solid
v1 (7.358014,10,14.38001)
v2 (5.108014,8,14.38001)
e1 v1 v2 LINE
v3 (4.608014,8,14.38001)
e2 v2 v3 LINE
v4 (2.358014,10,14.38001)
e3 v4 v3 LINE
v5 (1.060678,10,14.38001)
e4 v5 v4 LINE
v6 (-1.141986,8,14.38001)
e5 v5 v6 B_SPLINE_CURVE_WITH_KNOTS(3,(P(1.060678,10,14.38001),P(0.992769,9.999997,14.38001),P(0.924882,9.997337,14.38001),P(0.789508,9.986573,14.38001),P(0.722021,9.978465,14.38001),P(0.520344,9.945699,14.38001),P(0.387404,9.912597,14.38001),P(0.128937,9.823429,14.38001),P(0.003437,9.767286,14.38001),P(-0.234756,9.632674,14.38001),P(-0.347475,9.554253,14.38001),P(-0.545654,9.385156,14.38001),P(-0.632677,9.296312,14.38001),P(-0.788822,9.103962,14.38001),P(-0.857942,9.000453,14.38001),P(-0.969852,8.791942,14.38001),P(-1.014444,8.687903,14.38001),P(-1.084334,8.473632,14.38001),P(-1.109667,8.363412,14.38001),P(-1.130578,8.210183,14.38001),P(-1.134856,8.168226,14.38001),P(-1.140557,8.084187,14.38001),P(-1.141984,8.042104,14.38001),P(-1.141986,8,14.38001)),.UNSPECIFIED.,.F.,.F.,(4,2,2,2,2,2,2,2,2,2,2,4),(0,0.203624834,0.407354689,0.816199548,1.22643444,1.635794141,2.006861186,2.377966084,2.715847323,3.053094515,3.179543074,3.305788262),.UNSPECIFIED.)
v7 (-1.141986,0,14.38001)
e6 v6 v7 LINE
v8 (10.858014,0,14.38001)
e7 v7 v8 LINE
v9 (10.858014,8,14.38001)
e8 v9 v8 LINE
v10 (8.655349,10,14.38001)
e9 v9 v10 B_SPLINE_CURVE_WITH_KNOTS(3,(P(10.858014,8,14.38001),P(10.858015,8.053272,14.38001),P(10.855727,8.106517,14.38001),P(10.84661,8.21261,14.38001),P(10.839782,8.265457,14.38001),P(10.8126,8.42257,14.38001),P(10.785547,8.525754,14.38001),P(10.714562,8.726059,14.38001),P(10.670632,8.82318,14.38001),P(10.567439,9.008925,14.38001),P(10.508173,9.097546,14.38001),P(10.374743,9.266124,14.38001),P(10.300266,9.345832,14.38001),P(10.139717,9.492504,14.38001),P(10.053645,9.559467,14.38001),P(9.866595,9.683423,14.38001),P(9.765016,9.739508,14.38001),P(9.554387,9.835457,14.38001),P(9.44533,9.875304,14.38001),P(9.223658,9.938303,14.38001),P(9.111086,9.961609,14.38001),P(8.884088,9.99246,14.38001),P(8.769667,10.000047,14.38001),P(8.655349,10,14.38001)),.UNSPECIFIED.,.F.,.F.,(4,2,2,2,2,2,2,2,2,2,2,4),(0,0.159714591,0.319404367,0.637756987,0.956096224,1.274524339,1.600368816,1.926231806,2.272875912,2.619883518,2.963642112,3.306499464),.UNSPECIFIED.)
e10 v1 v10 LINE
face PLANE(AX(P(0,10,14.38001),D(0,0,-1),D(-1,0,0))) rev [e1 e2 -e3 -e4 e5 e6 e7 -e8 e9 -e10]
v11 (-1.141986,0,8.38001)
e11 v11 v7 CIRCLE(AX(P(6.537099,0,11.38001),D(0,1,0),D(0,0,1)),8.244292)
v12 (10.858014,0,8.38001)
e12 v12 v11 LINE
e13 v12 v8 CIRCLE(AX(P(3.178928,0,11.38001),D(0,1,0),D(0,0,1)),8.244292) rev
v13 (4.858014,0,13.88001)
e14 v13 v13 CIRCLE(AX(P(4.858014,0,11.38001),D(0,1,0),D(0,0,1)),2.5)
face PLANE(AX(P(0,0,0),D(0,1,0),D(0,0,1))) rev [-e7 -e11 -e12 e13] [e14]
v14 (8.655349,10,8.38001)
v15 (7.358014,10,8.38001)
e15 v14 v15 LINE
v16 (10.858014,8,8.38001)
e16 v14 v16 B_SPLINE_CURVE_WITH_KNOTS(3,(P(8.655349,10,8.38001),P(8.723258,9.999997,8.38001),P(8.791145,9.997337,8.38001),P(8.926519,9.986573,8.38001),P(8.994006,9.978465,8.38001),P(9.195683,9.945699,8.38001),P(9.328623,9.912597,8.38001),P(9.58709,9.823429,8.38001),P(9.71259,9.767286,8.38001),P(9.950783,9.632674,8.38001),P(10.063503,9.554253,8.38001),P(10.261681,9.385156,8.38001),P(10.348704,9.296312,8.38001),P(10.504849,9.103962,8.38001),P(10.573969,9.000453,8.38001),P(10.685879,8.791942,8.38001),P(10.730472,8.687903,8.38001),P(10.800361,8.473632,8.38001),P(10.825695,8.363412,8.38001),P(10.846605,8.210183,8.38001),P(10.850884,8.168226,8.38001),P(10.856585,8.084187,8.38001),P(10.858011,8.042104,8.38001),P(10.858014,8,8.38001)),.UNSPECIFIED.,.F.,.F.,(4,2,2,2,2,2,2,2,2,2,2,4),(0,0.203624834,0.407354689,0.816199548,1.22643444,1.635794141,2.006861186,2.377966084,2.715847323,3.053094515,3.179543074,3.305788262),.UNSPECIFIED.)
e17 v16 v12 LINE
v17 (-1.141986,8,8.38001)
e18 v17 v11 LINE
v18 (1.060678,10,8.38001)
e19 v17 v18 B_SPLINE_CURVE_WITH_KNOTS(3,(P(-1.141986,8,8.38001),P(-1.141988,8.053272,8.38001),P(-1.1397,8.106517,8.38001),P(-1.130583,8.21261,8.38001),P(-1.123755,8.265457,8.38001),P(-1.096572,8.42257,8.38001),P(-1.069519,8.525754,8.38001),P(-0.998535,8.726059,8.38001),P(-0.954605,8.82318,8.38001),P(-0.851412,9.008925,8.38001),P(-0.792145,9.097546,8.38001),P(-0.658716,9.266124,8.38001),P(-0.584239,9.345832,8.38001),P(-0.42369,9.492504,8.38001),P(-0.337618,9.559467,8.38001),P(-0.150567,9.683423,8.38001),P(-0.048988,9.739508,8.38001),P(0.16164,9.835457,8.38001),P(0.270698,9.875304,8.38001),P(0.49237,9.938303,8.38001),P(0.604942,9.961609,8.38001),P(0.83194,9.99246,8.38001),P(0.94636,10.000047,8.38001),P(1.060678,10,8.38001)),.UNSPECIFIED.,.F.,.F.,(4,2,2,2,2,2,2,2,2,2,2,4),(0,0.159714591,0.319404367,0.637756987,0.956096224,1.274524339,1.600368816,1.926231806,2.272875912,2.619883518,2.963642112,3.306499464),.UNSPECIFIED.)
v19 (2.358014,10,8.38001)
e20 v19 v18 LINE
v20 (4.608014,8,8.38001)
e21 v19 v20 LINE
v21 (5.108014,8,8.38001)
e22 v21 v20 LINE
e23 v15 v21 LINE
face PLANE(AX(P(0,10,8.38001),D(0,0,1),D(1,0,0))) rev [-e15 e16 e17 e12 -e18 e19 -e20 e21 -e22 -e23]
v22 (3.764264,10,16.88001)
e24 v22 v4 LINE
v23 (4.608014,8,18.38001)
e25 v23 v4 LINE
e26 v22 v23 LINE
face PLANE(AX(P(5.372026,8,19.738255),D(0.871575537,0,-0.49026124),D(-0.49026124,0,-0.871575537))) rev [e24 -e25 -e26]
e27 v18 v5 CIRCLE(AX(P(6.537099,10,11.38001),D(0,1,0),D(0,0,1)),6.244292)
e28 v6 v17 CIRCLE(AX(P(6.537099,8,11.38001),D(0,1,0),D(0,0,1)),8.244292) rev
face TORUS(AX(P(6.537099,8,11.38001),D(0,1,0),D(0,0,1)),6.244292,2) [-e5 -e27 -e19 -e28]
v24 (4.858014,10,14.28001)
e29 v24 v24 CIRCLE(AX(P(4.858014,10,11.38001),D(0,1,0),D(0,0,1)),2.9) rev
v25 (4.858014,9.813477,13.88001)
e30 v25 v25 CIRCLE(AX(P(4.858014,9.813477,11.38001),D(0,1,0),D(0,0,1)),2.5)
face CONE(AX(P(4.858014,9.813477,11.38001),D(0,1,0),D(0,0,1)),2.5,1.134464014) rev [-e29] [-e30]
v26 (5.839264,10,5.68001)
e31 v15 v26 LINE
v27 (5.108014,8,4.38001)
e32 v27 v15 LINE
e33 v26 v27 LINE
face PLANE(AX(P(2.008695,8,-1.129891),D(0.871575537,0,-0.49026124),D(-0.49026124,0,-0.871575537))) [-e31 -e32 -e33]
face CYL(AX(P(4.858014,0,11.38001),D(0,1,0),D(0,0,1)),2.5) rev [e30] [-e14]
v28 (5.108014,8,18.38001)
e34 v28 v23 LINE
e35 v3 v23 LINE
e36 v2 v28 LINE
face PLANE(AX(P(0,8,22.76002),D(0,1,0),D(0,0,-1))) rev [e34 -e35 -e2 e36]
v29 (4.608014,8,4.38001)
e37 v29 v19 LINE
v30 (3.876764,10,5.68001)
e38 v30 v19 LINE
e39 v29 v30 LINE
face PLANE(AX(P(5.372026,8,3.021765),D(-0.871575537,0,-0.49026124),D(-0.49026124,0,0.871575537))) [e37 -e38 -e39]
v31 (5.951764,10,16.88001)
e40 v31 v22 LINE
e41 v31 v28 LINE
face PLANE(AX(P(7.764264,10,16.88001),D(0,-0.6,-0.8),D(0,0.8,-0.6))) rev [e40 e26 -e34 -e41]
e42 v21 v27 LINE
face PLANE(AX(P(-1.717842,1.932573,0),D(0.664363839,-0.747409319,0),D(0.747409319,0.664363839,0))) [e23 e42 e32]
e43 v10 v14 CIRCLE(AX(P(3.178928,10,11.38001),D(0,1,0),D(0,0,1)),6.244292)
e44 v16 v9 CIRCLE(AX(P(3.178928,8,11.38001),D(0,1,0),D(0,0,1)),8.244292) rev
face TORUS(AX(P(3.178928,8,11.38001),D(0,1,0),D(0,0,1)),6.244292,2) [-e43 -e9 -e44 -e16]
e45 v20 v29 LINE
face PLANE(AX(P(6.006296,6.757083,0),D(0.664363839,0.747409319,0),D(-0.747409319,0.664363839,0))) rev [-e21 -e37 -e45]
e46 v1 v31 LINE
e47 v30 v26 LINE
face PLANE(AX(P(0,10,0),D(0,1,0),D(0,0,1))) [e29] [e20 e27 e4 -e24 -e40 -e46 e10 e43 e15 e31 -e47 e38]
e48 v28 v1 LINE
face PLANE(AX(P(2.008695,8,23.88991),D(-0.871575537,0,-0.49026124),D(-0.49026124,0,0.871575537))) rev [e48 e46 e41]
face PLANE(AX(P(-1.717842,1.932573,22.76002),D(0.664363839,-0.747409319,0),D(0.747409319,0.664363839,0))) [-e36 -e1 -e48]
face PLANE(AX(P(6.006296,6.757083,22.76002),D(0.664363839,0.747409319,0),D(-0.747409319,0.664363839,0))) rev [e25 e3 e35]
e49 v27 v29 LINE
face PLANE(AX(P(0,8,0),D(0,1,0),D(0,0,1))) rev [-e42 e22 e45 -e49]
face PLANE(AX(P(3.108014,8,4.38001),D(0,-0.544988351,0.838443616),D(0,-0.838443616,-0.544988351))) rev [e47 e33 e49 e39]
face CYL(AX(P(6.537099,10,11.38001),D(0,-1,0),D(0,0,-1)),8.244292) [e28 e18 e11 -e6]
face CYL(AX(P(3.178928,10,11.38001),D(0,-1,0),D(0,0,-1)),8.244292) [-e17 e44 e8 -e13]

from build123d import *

# Parameters (mm, degrees)
SALIENTE_EXTRUIR1_DEPTH   = 10
CROQUIS2_R                = 2.5
CORTAR_EXTRUIR1_DEPTH     = 10
CHAFL_N1_SIZE             = 0.4
CHAFL_N1_SIZE2            = 0.186523063
SALIENTE_EXTRUIR2_DEPTH   = 2
CORTAR_EXTRUIR2_START     = 0.687515582
CORTAR_EXTRUIR2_OUTLINE_W = 5
CORTAR_EXTRUIR2_OUTLINE_H = 5
CORTAR_EXTRUIR2_DEPTH     = 2.312484418
CORTAR_EXTRUIR4_DEPTH     = 9.799366623
CORTAR_EXTRUIR5_DEPTH     = 4
CORTAR_EXTRUIR6_START     = 19.504007809
CORTAR_EXTRUIR6_OUTLINE_W = 5
CORTAR_EXTRUIR6_OUTLINE_H = 5
CORTAR_EXTRUIR6_DEPTH     = 1.2
REDONDEO1_R               = 2


with BuildPart() as part:
    # Croquis1 → Saliente-Extruir1 (new body)
    with BuildSketch(Plane(origin=(0, 0, 0), x_dir=(1, 0, 0), z_dir=(0, 1, 0))):
        with BuildLine():
            Line((4.858013613, -14.380009761), (4.858013613, -8.380009761))
            Line((4.858013613, -8.380009761), (-1.141986387, -8.380009761))
            ThreePointArc((-1.141986387, -8.380009761), (-1.707193124, -11.380009761), (-1.141986387, -14.380009761))
            Line((-1.141986387, -14.380009761), (4.858013613, -14.380009761))
        make_face()
        with BuildLine():
            Line((10.858013613, -8.380009761), (4.858013613, -8.380009761))
            Line((4.858013613, -8.380009761), (4.858013613, -14.380009761))
            Line((4.858013613, -14.380009761), (10.858013613, -14.380009761))
            ThreePointArc((10.858013613, -14.380009761), (11.423220351, -11.380009761), (10.858013613, -8.380009761))
        make_face()
    extrude(amount=SALIENTE_EXTRUIR1_DEPTH)

    # Croquis2 → Cortar-Extruir1 (cut)
    with BuildSketch(Plane(origin=(0, 10, 0), x_dir=(1, 0, 0), z_dir=(0, 1, 0))):
        with Locations(Location((4.858013613, -11.380009761, 0), (0, 0, 270))):
            Circle(CROQUIS2_R)
    extrude(amount=-CORTAR_EXTRUIR1_DEPTH, mode=Mode.SUBTRACT)

    # Chaflán1
    chafl_n1_edges = [part.edges().sort_by_distance(p)[0] for p in [
        (4.858013613, 10, 8.880009761),
    ]]
    chafl_n1_side = [part.faces().sort_by_distance(p)[0] for p in [
        (4.858013613, 10, 8.524373107),
    ]]
    chamfer(chafl_n1_edges, length=CHAFL_N1_SIZE, length2=CHAFL_N1_SIZE2, reference=chafl_n1_side[0])

    # Croquis3 → Saliente-Extruir2 (add)
    with BuildSketch(Plane(origin=(0, 10, 0), x_dir=(1, 0, 0), z_dir=(0, 1, 0))):
        Polygon((2.358013613, -8.380009761), (4.858013613, -8.380009761), (4.858013613, -4.380009761), (4.608013613, -4.380009761), align=None)
        Polygon((4.858013613, -4.380009761), (4.858013613, -8.380009761), (7.358013613, -8.380009761), (5.108013613, -4.380009761), align=None)
    saliente_extruir2 = extrude(amount=-SALIENTE_EXTRUIR2_DEPTH)

    # Cortar-Extruir2: read off the stored shape, not the designer's step
    # Cortar-Extruir2 outline → Cortar-Extruir2 (cut)
    with BuildSketch(Plane(origin=(0, 0, 0), x_dir=(1, 0, 0), z_dir=(0, 0.5449883505954141, -0.8384436163006372)).offset(CORTAR_EXTRUIR2_START)):
        with Locations((4.5, -10.5)):
            Rectangle(CORTAR_EXTRUIR2_OUTLINE_W, CORTAR_EXTRUIR2_OUTLINE_H)
    extrude(amount=CORTAR_EXTRUIR2_DEPTH, mode=Mode.SUBTRACT)

    # Cortar-Extruir4: read off the stored shape, not the designer's step
    # Cortar-Extruir4 outline → Cortar-Extruir4 (cut)
    with BuildSketch(Plane(origin=(-1.717842267, 1.932572551, 0), x_dir=(-0.7474093186836599, -0.6643638388299198, 0), z_dir=(0.6643638388299198, -0.7474093186836599, 0))):
        Polygon((-9.132687685, -4.380009761), (-12.14308633, -8.380009761), (-9.132687685, -8.380009761), align=None)
    cortar_extruir4 = extrude(amount=CORTAR_EXTRUIR4_DEPTH, mode=Mode.SUBTRACT)

    # Croquis13 → Cortar-Extruir5 (cut, along a direction that is not the sketch's normal)
    with BuildSketch(Plane(origin=(6.006295664, 6.757082622, 0), x_dir=(0.7474093186836596, -0.66436383882992, 0), z_dir=(0.66436383882992, 0.7474093186836596, 0))):
        Polygon((-1.870838395, -8.380009761), (-1.870838395, -4.380009761), (-4.88123704, -8.380009761), align=None)
    cortar_extruir5 = extrude(amount=-CORTAR_EXTRUIR5_DEPTH, dir=(0, 1, 0), mode=Mode.SUBTRACT)

    # Simetría1: Saliente-Extruir2 across plane
    add(saliente_extruir2.mirror(Plane(origin=(0, 0, 11.380009761), x_dir=(1, 0, 0), z_dir=(0, 0, -1))))

    # Simetría3: Cortar-Extruir4, Cortar-Extruir5 across plane
    add(cortar_extruir4.mirror(Plane(origin=(0, 0, 11.380009761), x_dir=(1, 0, 0), z_dir=(0, 0, -1))), mode=Mode.SUBTRACT)
    add(cortar_extruir5.mirror(Plane(origin=(0, 0, 11.380009761), x_dir=(1, 0, 0), z_dir=(0, 0, -1))), mode=Mode.SUBTRACT)

    # Cortar-Extruir6: read off the stored shape, not the designer's step
    # Cortar-Extruir6 outline → Cortar-Extruir6 (cut)
    with BuildSketch(Plane(origin=(0, 0, 0), x_dir=(1, 0, 0), z_dir=(0, 0.5999999999999971, 0.8000000000000023)).offset(CORTAR_EXTRUIR6_START)):
        with Locations((4.5, -3.5)):
            Rectangle(CORTAR_EXTRUIR6_OUTLINE_W, CORTAR_EXTRUIR6_OUTLINE_H)
    extrude(amount=CORTAR_EXTRUIR6_DEPTH, mode=Mode.SUBTRACT)

    # Redondeo1
    redondeo1_edges = [part.edges().sort_by_distance(p)[0] for p in [
        (-1.707193124, 10, 11.380009761),
        (11.423220351, 10, 11.380009761),
    ]]
    fillet(redondeo1_edges, radius=REDONDEO1_R)


solid = part.part
